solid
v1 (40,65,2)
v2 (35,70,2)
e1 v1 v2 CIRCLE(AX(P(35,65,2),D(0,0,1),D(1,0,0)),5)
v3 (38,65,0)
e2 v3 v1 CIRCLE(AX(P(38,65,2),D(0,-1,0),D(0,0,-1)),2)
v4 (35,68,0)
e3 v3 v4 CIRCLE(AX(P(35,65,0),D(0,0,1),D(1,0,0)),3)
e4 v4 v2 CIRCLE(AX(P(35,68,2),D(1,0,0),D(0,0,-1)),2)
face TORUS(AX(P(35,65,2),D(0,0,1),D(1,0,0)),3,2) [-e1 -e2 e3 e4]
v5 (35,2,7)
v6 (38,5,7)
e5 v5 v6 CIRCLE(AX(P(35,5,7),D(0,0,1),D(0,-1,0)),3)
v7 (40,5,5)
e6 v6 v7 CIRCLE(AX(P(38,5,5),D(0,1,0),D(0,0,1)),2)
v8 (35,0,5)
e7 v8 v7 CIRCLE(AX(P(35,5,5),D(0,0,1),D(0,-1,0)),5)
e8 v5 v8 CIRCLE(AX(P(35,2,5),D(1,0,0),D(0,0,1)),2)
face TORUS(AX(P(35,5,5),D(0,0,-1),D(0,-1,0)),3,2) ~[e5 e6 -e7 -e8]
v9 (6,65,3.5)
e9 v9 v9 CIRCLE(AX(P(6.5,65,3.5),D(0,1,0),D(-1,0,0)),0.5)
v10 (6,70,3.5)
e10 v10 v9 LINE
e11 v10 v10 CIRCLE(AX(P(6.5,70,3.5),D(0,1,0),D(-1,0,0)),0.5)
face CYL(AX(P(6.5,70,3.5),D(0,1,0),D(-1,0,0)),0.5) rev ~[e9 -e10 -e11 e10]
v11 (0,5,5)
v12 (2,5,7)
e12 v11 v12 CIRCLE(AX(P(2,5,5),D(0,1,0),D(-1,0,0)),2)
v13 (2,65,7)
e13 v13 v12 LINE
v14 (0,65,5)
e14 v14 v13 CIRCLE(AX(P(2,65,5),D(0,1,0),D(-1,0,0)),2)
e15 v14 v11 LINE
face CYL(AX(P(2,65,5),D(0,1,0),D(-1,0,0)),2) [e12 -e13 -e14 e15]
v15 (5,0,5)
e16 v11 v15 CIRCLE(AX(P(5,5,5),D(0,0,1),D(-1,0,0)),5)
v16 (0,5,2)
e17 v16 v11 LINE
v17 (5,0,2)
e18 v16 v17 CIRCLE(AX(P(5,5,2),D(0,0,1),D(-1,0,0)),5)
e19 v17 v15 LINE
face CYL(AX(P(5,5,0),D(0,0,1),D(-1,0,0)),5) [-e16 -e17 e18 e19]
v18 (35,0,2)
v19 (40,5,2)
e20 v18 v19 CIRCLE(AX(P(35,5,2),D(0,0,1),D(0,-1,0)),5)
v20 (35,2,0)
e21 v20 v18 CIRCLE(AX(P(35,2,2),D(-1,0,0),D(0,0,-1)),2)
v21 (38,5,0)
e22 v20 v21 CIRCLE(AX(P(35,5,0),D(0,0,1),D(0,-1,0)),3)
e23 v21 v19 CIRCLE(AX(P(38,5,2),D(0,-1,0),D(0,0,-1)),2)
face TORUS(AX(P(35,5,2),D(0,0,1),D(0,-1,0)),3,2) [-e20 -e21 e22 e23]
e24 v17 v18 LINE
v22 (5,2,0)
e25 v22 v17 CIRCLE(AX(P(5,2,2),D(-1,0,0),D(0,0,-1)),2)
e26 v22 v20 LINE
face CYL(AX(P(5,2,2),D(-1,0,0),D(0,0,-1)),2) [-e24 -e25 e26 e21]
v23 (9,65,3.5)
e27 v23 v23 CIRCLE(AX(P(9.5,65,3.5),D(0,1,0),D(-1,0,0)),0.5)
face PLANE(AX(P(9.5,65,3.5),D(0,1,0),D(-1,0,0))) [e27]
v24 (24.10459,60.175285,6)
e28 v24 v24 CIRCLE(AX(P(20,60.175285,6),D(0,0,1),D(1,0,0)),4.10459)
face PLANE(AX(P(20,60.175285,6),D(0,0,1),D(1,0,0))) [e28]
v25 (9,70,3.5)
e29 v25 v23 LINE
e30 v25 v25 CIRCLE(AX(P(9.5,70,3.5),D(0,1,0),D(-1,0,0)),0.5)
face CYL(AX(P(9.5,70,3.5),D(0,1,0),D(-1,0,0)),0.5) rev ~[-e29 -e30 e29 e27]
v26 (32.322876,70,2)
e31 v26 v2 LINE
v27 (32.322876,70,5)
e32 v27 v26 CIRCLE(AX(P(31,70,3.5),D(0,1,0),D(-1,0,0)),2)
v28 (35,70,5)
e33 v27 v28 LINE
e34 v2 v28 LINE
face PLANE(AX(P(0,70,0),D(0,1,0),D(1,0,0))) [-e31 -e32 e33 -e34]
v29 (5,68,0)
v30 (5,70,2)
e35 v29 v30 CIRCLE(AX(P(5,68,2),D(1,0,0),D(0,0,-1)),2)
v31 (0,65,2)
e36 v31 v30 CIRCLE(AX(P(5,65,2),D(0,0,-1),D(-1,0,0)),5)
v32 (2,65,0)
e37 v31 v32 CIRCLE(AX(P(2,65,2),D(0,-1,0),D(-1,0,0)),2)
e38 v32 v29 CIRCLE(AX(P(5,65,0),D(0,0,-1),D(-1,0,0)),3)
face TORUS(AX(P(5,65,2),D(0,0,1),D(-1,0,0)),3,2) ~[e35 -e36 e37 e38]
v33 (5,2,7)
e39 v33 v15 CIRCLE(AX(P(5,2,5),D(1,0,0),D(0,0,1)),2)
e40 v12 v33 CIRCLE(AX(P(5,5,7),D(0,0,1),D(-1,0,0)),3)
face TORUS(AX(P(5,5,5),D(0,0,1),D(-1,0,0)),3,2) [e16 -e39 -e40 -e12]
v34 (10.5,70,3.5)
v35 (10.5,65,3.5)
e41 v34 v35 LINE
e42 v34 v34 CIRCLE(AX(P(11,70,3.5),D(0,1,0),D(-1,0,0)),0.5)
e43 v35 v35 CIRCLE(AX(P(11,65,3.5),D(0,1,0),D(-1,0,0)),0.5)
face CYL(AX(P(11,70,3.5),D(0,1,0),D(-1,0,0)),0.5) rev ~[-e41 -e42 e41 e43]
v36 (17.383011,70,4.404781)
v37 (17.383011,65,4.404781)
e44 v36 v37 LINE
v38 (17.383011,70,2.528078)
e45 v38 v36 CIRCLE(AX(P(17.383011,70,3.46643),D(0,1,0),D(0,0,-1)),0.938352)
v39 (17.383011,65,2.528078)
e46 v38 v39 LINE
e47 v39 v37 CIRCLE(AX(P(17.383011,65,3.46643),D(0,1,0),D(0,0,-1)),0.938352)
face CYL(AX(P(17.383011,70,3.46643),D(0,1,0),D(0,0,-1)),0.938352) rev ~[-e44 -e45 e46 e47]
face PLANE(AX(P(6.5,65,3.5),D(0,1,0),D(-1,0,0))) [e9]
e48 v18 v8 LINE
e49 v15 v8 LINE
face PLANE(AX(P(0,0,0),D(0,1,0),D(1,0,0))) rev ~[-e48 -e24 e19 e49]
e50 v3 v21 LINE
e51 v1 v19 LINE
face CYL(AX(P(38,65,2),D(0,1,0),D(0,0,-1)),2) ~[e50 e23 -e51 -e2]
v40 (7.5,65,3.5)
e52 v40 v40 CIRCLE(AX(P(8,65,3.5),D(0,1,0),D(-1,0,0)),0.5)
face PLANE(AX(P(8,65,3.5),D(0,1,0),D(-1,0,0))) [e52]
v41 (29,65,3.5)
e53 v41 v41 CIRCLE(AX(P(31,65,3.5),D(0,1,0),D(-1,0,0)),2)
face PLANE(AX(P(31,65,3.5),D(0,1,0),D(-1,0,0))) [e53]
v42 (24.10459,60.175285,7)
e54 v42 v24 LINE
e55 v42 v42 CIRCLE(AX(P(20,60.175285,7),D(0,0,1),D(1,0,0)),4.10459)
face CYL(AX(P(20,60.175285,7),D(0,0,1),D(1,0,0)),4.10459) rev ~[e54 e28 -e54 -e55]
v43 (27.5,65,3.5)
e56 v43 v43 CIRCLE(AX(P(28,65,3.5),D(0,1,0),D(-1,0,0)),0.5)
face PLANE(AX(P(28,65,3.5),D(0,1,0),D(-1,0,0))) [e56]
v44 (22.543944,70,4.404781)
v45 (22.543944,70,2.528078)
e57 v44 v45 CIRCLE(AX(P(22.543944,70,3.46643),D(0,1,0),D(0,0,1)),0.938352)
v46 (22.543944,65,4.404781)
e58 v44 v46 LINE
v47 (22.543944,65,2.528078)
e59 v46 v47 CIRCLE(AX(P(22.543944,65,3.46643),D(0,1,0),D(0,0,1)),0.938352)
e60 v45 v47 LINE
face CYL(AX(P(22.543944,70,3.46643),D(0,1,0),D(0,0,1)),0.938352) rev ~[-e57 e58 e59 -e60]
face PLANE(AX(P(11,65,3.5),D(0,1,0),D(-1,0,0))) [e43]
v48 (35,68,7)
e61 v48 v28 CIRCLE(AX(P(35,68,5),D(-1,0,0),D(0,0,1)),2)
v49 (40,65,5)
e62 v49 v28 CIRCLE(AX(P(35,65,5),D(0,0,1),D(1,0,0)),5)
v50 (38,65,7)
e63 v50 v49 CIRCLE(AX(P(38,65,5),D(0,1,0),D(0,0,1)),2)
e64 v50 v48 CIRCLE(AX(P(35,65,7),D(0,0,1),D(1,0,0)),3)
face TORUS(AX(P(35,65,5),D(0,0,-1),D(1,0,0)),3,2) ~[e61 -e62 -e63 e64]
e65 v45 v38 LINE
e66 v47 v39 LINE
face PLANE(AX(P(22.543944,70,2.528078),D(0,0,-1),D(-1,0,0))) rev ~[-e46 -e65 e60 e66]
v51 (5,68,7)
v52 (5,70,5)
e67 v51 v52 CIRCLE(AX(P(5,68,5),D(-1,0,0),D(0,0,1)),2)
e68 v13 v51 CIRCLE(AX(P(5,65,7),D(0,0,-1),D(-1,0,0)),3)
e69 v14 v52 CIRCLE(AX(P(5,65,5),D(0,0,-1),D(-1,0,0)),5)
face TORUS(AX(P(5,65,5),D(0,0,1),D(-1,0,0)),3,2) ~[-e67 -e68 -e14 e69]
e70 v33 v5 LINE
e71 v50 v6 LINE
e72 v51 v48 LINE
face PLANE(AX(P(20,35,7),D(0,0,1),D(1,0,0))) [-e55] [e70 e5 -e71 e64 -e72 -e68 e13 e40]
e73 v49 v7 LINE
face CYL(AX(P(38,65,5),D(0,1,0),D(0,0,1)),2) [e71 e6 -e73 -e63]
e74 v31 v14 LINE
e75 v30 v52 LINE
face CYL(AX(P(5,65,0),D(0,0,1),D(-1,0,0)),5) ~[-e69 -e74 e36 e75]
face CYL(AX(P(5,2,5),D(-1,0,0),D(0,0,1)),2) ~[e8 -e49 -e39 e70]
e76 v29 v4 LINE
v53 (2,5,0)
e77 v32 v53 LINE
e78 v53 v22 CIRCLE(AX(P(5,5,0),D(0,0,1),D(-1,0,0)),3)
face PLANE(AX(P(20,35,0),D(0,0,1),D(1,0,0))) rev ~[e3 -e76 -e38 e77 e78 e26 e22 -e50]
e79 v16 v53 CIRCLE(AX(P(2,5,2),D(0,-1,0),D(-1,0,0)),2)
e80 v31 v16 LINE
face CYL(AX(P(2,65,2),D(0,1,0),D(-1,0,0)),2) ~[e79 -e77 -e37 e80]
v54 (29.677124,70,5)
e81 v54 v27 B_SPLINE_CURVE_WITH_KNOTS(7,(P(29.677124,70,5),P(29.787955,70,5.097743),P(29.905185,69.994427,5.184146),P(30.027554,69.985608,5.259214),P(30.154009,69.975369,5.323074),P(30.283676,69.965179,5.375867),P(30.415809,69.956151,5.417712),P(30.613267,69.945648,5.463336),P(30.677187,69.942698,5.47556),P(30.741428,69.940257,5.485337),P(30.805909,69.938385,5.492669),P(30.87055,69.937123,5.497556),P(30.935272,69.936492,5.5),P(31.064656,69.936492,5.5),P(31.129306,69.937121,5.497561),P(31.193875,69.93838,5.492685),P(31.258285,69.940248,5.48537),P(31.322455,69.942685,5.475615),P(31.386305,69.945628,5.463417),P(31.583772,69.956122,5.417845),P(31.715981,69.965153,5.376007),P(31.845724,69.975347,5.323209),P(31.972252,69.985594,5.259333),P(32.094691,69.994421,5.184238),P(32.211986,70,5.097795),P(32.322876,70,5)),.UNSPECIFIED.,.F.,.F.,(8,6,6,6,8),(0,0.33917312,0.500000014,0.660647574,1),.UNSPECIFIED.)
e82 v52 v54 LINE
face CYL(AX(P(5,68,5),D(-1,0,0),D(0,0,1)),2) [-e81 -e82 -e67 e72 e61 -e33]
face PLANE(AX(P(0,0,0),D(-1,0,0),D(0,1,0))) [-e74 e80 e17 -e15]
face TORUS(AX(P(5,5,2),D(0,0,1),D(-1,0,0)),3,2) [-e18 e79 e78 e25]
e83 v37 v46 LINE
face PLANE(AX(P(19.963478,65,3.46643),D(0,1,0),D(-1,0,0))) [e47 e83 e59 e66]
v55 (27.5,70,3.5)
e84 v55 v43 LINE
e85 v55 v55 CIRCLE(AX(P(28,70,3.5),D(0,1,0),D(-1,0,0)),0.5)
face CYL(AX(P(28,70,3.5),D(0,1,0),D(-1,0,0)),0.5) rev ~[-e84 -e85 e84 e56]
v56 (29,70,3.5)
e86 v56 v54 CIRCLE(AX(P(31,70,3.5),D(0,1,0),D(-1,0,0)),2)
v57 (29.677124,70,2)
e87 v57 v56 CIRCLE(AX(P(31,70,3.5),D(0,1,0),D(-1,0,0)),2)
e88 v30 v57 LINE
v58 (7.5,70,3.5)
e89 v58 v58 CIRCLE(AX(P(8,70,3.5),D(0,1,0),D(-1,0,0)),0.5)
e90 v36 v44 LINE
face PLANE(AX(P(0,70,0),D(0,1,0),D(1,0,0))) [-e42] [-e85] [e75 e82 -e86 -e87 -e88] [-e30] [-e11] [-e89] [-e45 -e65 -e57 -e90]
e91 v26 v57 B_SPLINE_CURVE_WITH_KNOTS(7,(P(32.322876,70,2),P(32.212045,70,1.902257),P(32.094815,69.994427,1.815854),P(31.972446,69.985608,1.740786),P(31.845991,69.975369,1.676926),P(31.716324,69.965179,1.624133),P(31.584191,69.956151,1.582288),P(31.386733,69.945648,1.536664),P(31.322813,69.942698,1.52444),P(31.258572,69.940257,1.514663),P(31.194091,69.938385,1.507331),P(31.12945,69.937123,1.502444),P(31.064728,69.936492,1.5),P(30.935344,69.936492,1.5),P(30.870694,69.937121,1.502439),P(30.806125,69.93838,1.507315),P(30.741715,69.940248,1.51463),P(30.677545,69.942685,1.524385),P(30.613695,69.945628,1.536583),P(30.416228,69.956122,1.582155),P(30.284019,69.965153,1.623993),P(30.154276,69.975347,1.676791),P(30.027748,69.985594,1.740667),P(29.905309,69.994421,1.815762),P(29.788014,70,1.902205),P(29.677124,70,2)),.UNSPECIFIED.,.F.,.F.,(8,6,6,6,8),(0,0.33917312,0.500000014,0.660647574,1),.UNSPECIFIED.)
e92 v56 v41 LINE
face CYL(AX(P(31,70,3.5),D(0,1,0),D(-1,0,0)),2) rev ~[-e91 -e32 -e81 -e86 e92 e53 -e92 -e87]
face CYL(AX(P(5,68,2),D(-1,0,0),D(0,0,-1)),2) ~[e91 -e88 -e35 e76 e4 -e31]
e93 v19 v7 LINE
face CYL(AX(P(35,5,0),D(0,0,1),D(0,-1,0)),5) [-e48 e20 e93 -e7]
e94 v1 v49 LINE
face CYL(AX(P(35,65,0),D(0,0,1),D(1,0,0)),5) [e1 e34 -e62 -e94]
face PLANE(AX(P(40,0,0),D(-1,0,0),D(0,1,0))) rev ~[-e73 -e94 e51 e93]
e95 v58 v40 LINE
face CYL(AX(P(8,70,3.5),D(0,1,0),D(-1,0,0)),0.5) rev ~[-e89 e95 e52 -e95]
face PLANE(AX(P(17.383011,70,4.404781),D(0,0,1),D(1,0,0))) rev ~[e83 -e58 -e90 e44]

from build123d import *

# Parameters (mm, degrees)
F0_W         = 40
F0_H         = 70
F1_DEPTH     = 7
F2_R         = 5
F3_R         = 2
F4_DEPTH     = 5
F5_T1_DEPTH  = 30
F5_T3_DEPTH  = 60
F5_T6_ANGLE  = 90
F5_T8_ANGLE  = 90
F5_T10_ANGLE = 90
F5_T12_ANGLE = 90
F5_T14_ANGLE = 90
F5_T16_ANGLE = 90
F5_T18_ANGLE = 90
F5_T20_ANGLE = 90
F6_R         = 4.1045895756
F7_DEPTH     = 1
F8_R         = 0.5
F9_DEPTH     = 5
F11_DEPTH    = 5
F12_R        = 0.5
F13_DEPTH    = 5


# Not quite as in the source:
# - a fillet or chamfer that OpenCascade refuses, or shapes differently, is made with other operations: its cross-section is extruded or revolved along the edge and cut away or added


with BuildPart() as f1:
    # F0 (on Top) → F1 (new body)
    with BuildSketch(Plane.XY):
        with Locations((20, 35)):
            Rectangle(F0_W, F0_H)
    extrude(amount=F1_DEPTH)

    # F2
    f2_edges = [f1.edges().sort_by_distance(p)[0] for p in [
        (40, 0, 3.5),
        (0, 0, 3.5),
        (40, 70, 3.5),
        (0, 70, 3.5),
    ]]
    fillet(f2_edges, radius=F2_R)

    # F3 (on face) → F4 (cut)
    with BuildSketch(Plane(origin=(0, 70, 0), x_dir=(-1, 0, 0), z_dir=(0, 1, 0))):
        with Locations((-31, 3.5)):
            Circle(F3_R)
    extrude(amount=-F4_DEPTH, mode=Mode.SUBTRACT)

    # F5: fillet of radius 2 on 16 edges, made by hand

    # F5_s2 → F5_t1 (cut)
    with BuildSketch(Plane.YZ.offset(5)):
        with BuildLine():
            ThreePointArc((68, 7), (69.4142135624, 6.4142135624), (70, 5))
            Line((70, 5), (70, 7))
            Line((70, 7), (68, 7))
        make_face()
        with BuildLine():
            ThreePointArc((68, 0), (69.4142135624, 0.5857864376), (70, 2))
            Line((70, 2), (70, 0))
            Line((70, 0), (68, 0))
        make_face()
        with BuildLine():
            ThreePointArc((2, 0), (0.5857864376, 0.5857864376), (0, 2))
            Line((0, 2), (0, 0))
            Line((0, 0), (2, 0))
        make_face()
        with BuildLine():
            ThreePointArc((2, 7), (0.5857864376, 6.4142135624), (0, 5))
            Line((0, 5), (0, 7))
            Line((0, 7), (2, 7))
        make_face()
    extrude(amount=F5_T1_DEPTH, mode=Mode.SUBTRACT)

    # F5_s4 → F5_t3 (cut)
    with BuildSketch(Plane.XZ.offset(-65)):
        with BuildLine():
            ThreePointArc((0, 2), (0.5857864376, 0.5857864376), (2, 0))
            Line((2, 0), (0, 0))
            Line((0, 0), (0, 2))
        make_face()
        with BuildLine():
            ThreePointArc((0, 5), (0.5857864376, 6.4142135624), (2, 7))
            Line((2, 7), (0, 7))
            Line((0, 7), (0, 5))
        make_face()
        with BuildLine():
            ThreePointArc((38, 0), (39.4142135624, 0.5857864376), (40, 2))
            Line((40, 2), (40, 0))
            Line((40, 0), (38, 0))
        make_face()
        with BuildLine():
            ThreePointArc((38, 7), (39.4142135624, 6.4142135624), (40, 5))
            Line((40, 5), (40, 7))
            Line((40, 7), (38, 7))
        make_face()
    extrude(amount=F5_T3_DEPTH, mode=Mode.SUBTRACT)

    # F5_s5 → F5_t6 (revolve, cut)
    with BuildSketch(Plane.XZ.offset(-65)):
        with BuildLine():
            ThreePointArc((2, 0), (0.5857864376, 0.5857864376), (0, 2))
            Line((0, 2), (0, 0))
            Line((0, 0), (2, 0))
        make_face()
    revolve(axis=Axis((5, 65, 0), (0, 0, -1)), revolution_arc=F5_T6_ANGLE, mode=Mode.SUBTRACT)

    # F5_s7 → F5_t8 (revolve, cut)
    with BuildSketch(Plane.XZ.offset(-5)):
        with BuildLine():
            ThreePointArc((2, 0), (0.5857864376, 0.5857864376), (0, 2))
            Line((0, 2), (0, 0))
            Line((0, 0), (2, 0))
        make_face()
    revolve(axis=Axis((5, 5, 0), (0, 0, 1)), revolution_arc=F5_T8_ANGLE, mode=Mode.SUBTRACT)

    # F5_s9 → F5_t10 (revolve, cut)
    with BuildSketch(Plane.XZ.offset(-65)):
        with BuildLine():
            ThreePointArc((38, 0), (39.4142135624, 0.5857864376), (40, 2))
            Line((40, 2), (40, 0))
            Line((40, 0), (38, 0))
        make_face()
    revolve(axis=Axis((35, 65, 0), (0, 0, 1)), revolution_arc=F5_T10_ANGLE, mode=Mode.SUBTRACT)

    # F5_s11 → F5_t12 (revolve, cut)
    with BuildSketch(Plane.YZ.offset(35)):
        with BuildLine():
            ThreePointArc((2, 0), (0.5857864376, 0.5857864376), (0, 2))
            Line((0, 2), (0, 0))
            Line((0, 0), (2, 0))
        make_face()
    revolve(axis=Axis((35, 5, 0), (0, 0, 1)), revolution_arc=F5_T12_ANGLE, mode=Mode.SUBTRACT)

    # F5_s13 → F5_t14 (revolve, cut)
    with BuildSketch(Plane.XZ.offset(-65)):
        with BuildLine():
            ThreePointArc((0, 5), (0.5857864376, 6.4142135624), (2, 7))
            Line((2, 7), (0, 7))
            Line((0, 7), (0, 5))
        make_face()
    revolve(axis=Axis((5, 65, 7), (0, 0, -1)), revolution_arc=F5_T14_ANGLE, mode=Mode.SUBTRACT)

    # F5_s15 → F5_t16 (revolve, cut)
    with BuildSketch(Plane.XZ.offset(-5)):
        with BuildLine():
            ThreePointArc((0, 5), (0.5857864376, 6.4142135624), (2, 7))
            Line((2, 7), (0, 7))
            Line((0, 7), (0, 5))
        make_face()
    revolve(axis=Axis((5, 5, 7), (0, 0, 1)), revolution_arc=F5_T16_ANGLE, mode=Mode.SUBTRACT)

    # F5_s17 → F5_t18 (revolve, cut)
    with BuildSketch(Plane.XZ.offset(-65)):
        with BuildLine():
            ThreePointArc((38, 7), (39.4142135624, 6.4142135624), (40, 5))
            Line((40, 5), (40, 7))
            Line((40, 7), (38, 7))
        make_face()
    revolve(axis=Axis((35, 65, 7), (0, 0, 1)), revolution_arc=F5_T18_ANGLE, mode=Mode.SUBTRACT)

    # F5_s19 → F5_t20 (revolve, cut)
    with BuildSketch(Plane.YZ.offset(35)):
        with BuildLine():
            ThreePointArc((2, 7), (0.5857864376, 6.4142135624), (0, 5))
            Line((0, 5), (0, 7))
            Line((0, 7), (2, 7))
        make_face()
    revolve(axis=Axis((35, 5, 7), (0, 0, 1)), revolution_arc=F5_T20_ANGLE, mode=Mode.SUBTRACT)

    # F6 (on face) → F7 (cut)
    with BuildSketch(Plane.XY.offset(7)):
        with Locations((20, 60.1752847433)):
            Circle(F6_R)
    extrude(amount=-F7_DEPTH, mode=Mode.SUBTRACT)

    # F8 (on face) → F9 (cut)
    with BuildSketch(Plane(origin=(0, 70, 0), x_dir=(-1, 0, 0), z_dir=(0, 1, 0))):
        with Locations((-28, 3.5)):
            Circle(F8_R)
    extrude(amount=-F9_DEPTH, mode=Mode.SUBTRACT)

    # F10 (on face) → F11 (cut)
    with BuildSketch(Plane(origin=(0, 70, 0), x_dir=(-1, 0, 0), z_dir=(0, 1, 0))):
        with BuildLine():
            Line((-17.383011058, 4.4047813863), (-22.5439444184, 4.4047813863))
            ThreePointArc((-22.5439444184, 4.4047813863), (-23.4822960338, 3.4664297709), (-22.5439444184, 2.5280781556))
            Line((-22.5439444184, 2.5280781556), (-17.383011058, 2.5280781556))
            ThreePointArc((-17.383011058, 2.5280781556), (-16.4446594426, 3.4664297709), (-17.383011058, 4.4047813863))
        make_face()
    extrude(amount=-F11_DEPTH, mode=Mode.SUBTRACT)

    # F12 (on face) → F13 (cut)
    with BuildSketch(Plane(origin=(0, 70, 0), x_dir=(-1, 0, 0), z_dir=(0, 1, 0))):
        with Locations((-6.5, 3.5)):
            Circle(F12_R)
        with Locations((-8, 3.5)):
            Circle(F12_R)
        with Locations((-9.5, 3.5)):
            Circle(F12_R)
        with Locations((-11, 3.5)):
            Circle(F12_R)
    extrude(amount=-F13_DEPTH, mode=Mode.SUBTRACT)


solid = f1.part
